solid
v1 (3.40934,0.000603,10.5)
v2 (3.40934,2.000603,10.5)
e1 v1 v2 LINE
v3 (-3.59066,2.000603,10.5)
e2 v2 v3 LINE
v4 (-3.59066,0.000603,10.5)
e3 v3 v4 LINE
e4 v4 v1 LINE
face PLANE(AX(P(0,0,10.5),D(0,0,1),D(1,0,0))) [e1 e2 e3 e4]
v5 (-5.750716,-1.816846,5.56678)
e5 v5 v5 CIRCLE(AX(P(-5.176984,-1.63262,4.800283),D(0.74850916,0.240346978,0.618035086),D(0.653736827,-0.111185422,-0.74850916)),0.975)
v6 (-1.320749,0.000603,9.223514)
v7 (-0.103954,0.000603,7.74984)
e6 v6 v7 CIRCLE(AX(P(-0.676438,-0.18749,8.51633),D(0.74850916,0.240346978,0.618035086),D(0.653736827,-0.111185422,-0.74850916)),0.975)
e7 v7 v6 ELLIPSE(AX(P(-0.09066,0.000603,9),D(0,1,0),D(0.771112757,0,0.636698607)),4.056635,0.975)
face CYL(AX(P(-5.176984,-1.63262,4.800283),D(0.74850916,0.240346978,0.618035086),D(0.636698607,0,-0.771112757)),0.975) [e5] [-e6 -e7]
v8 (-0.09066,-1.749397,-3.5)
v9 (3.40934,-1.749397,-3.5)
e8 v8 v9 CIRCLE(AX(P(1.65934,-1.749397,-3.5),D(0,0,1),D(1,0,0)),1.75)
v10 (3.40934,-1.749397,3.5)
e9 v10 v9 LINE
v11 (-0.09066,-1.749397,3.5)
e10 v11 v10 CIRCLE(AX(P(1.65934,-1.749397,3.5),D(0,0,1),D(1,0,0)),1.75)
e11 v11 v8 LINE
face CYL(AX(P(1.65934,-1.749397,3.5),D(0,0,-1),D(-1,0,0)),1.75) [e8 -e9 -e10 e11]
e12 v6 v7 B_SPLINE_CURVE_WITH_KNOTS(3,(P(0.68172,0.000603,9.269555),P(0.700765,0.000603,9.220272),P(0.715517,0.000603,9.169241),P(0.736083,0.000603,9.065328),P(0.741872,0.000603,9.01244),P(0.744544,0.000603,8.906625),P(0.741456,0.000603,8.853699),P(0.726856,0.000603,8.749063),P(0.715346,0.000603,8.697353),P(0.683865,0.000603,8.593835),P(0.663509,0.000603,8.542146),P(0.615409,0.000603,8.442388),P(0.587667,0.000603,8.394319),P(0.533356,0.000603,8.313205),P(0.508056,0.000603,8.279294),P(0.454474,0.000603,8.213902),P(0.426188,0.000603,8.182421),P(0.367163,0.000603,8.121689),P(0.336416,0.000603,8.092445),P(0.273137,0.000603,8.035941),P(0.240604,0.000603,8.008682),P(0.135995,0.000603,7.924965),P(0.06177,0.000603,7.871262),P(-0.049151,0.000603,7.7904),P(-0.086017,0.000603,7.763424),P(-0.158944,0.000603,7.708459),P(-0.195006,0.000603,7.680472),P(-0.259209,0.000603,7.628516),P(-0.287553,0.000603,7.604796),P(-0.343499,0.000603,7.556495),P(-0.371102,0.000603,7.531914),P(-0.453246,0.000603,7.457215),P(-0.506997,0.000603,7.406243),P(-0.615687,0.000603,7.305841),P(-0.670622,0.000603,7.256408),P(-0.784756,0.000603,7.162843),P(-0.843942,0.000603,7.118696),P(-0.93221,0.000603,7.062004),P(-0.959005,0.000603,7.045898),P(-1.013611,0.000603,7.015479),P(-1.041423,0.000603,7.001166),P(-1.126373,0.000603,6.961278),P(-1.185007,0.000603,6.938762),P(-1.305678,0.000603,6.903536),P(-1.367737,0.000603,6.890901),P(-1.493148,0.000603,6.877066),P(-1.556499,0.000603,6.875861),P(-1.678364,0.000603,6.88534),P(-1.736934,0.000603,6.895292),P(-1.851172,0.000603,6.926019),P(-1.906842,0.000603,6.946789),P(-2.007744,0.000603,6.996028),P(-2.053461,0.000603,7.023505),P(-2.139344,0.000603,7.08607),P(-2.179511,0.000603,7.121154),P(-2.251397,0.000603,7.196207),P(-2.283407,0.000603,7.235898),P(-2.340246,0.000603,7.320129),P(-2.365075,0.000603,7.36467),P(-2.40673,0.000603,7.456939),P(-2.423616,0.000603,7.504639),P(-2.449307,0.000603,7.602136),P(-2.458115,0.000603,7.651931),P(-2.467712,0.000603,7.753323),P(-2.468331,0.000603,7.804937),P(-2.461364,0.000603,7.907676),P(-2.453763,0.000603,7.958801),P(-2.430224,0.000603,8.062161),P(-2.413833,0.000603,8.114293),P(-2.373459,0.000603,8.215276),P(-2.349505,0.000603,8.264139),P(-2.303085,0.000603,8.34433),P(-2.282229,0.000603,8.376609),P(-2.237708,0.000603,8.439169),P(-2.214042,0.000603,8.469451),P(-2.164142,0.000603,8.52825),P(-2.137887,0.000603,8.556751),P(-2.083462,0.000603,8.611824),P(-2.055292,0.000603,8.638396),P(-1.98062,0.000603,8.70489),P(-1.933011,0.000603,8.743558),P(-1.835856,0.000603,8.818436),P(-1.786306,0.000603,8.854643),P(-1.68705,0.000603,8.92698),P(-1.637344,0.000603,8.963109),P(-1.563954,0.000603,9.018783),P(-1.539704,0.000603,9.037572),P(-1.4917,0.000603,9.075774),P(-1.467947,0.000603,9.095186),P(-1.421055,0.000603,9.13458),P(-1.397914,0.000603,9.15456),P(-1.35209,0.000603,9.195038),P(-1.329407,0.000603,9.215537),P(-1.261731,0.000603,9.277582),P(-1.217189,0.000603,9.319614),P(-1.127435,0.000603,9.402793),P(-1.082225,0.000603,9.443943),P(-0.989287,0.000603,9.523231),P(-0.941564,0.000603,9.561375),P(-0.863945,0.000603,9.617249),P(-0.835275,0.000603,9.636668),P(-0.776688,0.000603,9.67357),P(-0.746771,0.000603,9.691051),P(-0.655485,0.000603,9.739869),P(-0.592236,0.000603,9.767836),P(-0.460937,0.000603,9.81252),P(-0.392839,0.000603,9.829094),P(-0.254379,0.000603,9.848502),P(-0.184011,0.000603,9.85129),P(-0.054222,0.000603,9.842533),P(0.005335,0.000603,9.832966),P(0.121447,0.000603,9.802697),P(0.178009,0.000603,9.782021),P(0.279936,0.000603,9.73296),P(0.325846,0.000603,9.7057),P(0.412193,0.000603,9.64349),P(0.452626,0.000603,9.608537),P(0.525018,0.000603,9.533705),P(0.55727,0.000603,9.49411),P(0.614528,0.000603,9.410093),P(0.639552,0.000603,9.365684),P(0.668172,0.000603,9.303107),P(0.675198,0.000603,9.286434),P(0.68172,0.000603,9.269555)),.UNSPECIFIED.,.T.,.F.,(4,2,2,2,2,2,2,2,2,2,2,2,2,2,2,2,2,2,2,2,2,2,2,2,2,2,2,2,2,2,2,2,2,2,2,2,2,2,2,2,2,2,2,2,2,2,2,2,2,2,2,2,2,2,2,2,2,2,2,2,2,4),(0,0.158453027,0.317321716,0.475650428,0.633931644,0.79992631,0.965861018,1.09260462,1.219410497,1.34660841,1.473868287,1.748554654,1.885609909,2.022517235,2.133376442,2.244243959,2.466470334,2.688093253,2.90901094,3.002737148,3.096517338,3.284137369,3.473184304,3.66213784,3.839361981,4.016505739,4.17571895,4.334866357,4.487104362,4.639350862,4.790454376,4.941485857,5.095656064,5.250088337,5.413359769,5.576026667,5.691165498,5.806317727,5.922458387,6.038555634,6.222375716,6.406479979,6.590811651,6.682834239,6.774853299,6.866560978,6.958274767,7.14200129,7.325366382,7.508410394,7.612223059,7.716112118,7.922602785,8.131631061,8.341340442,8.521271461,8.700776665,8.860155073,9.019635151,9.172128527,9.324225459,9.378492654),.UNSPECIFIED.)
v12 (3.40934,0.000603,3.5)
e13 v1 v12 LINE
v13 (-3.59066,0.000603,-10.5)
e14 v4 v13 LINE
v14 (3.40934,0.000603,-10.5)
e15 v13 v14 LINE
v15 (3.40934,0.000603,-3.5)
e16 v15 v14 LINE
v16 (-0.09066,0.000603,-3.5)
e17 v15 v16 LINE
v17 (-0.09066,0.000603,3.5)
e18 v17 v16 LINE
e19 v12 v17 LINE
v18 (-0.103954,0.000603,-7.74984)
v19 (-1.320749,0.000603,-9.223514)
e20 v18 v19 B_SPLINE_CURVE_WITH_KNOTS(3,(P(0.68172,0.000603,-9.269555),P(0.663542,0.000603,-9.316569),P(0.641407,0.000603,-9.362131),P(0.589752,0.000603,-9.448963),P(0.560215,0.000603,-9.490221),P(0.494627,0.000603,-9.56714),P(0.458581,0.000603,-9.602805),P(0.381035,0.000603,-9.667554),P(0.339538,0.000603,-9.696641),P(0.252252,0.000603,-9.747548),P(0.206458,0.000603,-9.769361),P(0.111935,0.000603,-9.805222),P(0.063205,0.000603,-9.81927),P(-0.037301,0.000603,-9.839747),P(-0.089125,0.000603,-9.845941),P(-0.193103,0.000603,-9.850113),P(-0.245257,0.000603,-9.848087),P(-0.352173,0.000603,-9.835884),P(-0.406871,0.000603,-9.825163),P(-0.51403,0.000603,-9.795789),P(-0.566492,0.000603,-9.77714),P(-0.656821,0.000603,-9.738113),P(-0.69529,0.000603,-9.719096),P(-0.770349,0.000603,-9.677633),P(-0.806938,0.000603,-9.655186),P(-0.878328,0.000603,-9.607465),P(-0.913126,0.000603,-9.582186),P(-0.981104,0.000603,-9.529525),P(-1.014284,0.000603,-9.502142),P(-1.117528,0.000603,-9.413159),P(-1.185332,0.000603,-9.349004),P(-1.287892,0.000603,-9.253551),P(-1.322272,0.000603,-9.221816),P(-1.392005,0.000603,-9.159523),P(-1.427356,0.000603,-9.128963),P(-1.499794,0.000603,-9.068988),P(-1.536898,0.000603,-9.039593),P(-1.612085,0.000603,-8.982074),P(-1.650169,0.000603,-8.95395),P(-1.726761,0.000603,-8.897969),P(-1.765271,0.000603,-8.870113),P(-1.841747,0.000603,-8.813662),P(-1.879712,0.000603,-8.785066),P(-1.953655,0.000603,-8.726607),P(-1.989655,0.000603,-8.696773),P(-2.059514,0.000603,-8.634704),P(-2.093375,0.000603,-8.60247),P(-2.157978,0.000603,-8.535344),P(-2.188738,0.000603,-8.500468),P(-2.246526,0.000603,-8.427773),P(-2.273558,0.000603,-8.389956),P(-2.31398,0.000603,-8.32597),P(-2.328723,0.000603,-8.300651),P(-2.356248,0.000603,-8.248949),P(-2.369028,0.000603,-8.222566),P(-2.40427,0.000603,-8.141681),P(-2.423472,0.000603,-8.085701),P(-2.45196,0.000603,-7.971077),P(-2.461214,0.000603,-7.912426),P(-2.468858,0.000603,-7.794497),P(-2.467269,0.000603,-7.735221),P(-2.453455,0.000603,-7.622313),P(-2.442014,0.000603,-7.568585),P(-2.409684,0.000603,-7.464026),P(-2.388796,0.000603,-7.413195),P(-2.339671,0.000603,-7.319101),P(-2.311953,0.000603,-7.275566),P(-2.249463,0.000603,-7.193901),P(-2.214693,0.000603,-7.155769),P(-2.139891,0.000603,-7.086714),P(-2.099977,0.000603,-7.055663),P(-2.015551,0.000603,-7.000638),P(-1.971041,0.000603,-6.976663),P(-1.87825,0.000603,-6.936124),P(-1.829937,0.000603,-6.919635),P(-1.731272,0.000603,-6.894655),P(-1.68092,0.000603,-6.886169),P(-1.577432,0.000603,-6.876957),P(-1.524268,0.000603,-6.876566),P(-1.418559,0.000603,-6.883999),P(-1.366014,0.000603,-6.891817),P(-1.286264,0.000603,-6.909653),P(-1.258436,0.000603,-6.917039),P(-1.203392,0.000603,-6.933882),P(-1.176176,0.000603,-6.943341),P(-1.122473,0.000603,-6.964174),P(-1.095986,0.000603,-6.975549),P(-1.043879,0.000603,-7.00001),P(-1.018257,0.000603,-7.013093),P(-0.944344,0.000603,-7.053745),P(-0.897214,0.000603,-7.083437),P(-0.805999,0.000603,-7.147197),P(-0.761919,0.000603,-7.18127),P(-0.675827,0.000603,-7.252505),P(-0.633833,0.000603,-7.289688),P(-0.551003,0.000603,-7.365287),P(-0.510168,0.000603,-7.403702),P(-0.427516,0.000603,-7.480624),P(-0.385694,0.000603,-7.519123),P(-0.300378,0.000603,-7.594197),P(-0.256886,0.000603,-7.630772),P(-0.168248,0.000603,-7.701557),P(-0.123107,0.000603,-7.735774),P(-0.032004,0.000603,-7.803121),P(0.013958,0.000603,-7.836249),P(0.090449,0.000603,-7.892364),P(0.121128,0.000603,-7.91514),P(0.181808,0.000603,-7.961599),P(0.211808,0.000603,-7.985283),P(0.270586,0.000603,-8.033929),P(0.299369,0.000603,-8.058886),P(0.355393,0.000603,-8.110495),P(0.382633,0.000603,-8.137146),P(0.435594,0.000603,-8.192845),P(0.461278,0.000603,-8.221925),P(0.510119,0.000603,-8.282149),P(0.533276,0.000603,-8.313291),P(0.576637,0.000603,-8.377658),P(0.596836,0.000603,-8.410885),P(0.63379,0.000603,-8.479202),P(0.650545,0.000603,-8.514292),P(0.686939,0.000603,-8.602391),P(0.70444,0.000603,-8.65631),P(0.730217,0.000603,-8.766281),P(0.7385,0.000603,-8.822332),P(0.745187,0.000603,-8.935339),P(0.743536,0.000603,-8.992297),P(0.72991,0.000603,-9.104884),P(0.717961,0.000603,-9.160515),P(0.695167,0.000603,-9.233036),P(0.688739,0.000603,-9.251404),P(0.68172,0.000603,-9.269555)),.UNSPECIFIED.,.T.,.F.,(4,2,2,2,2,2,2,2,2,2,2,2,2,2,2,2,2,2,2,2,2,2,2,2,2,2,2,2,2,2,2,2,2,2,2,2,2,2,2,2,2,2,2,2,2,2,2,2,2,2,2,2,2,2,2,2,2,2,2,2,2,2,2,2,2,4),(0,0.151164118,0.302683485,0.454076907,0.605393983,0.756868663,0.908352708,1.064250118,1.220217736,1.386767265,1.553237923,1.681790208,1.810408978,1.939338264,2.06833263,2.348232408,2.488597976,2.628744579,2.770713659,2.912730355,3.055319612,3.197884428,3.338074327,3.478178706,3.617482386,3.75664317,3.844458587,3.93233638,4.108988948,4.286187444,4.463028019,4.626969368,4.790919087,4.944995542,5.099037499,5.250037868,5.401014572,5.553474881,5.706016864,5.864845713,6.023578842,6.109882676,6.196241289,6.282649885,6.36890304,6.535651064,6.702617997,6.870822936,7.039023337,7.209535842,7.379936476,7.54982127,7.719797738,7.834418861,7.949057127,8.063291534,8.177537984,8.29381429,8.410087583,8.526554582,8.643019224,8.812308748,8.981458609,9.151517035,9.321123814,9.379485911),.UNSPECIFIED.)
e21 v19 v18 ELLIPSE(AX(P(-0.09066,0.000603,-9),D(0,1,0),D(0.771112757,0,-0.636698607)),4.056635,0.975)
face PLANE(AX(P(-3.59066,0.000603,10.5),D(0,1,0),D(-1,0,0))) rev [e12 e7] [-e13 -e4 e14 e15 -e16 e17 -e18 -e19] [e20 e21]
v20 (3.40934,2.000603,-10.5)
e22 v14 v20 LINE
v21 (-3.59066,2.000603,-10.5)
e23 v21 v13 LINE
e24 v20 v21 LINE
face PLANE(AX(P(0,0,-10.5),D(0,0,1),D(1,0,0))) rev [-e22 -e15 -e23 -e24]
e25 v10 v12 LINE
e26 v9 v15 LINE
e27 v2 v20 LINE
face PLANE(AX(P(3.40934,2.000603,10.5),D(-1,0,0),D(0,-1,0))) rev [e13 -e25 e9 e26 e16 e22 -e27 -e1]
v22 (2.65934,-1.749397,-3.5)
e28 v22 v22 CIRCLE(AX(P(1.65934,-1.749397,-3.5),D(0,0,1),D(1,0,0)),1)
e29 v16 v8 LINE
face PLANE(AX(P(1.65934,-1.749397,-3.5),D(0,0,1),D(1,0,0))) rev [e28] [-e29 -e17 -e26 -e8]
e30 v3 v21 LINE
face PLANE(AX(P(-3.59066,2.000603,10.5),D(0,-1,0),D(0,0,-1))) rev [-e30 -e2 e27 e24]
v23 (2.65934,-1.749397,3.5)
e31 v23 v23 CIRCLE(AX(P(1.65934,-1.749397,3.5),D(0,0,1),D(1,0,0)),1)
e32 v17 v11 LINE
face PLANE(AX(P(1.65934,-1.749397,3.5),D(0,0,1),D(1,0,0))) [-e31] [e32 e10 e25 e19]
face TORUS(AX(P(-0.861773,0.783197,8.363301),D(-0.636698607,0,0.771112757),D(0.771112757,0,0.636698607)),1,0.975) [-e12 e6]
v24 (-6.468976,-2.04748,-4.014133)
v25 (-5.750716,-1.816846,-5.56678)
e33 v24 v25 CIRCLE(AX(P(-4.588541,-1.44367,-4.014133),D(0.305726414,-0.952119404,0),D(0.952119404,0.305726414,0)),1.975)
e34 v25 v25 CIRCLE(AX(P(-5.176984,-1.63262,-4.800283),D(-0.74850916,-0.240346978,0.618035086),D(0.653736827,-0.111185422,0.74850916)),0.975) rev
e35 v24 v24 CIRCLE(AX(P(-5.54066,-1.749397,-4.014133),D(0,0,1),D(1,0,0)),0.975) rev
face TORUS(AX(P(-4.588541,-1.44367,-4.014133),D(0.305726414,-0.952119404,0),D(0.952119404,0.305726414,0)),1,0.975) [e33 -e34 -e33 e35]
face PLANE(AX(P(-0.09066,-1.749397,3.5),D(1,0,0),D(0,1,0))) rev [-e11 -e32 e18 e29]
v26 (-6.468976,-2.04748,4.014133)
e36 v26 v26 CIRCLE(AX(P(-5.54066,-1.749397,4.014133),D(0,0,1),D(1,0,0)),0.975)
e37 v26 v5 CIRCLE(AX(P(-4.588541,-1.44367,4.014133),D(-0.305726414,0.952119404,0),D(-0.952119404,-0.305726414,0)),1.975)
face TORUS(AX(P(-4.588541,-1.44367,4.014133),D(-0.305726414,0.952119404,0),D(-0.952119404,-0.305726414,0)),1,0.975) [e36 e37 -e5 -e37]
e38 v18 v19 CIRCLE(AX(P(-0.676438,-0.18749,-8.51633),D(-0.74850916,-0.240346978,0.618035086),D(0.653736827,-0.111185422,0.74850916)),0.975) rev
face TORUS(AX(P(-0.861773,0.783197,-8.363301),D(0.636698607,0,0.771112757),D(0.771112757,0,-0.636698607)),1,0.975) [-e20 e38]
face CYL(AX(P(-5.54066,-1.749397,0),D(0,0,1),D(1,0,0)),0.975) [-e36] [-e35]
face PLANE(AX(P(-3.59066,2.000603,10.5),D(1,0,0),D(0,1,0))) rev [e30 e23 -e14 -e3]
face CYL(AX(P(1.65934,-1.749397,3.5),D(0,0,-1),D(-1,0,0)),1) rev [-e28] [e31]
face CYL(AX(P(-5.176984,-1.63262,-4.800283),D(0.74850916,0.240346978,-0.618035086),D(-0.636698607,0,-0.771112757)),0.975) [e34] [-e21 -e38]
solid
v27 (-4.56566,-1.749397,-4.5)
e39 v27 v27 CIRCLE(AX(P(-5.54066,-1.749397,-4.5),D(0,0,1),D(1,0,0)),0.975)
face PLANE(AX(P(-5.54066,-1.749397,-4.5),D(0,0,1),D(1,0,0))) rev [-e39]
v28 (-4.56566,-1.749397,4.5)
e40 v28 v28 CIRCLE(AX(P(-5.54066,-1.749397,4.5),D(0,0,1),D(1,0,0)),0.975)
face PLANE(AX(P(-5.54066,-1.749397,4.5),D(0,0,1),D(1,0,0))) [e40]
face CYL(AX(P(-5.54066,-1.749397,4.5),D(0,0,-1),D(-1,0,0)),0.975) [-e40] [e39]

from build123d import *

# Parameters (mm, degrees)
SKETCH1_W           = 7
SKETCH1_H           = 2
BOSS_EXTRUDE1_DEPTH = 10.5
SKETCH2_R           = 1
BOSS_EXTRUDE2_DEPTH = 3.5
SKETCH3_R           = 0.975
BOSS_EXTRUDE3_DEPTH = 4.5
SWEEP1_ANGLE        = 52.758136
SWEEP1_2_OUTLINE_R  = 0.975
SWEEP1_2_ANGLE      = 51.827212
SWEEP1_START        = -1.300671735
SWEEP1_3_OUTLINE_R  = 0.975
SWEEP1_3_DEPTH      = 6.012679668
SWEEP1_4_OUTLINE_R  = 0.975
SWEEP1_4_DEPTH      = 4.014132691


with BuildPart() as part:
    # Sketch1 → Boss-Extrude1 (new, symmetric)
    with BuildSketch(Plane.XY):
        with Locations((-0.090659996, 1.000603453)):
            Rectangle(SKETCH1_W, SKETCH1_H)
    extrude(amount=BOSS_EXTRUDE1_DEPTH, both=True)

    # Sketch2 → Boss-Extrude2 (add, symmetric)
    with BuildSketch(Plane.XY):
        with BuildLine():
            Line((3.409340004, 0.000603453), (3.409340004, -1.749396547))
            ThreePointArc((3.409340004, -1.749396547), (1.659340004, -3.499396547), (-0.090659996, -1.749396547))
            Line((-0.090659996, -1.749396547), (-0.090659996, 0.000603453))
            Line((-0.090659996, 0.000603453), (3.409340004, 0.000603453))
        make_face()
        with Locations((1.659340004, -1.749396547)):
            Circle(SKETCH2_R, mode=Mode.SUBTRACT)
    extrude(amount=BOSS_EXTRUDE2_DEPTH, both=True)

    # Sweep1: read off the stored shape, not the designer's step
    # Sweep1 outline → Sweep1 (revolve)
    with BuildSketch(Plane(origin=(3.593677223, 0.783196597, 2.967256422), x_dir=(0.7080400901637386, -0.39610400747133684, 0.5846202579333633), z_dir=(0.3054408532938203, 0.9182056497676037, 0.2521988696921456))):
        with BuildLine():
            Line((0.806226014, -6.042187467), (0.806225946, -7.953288333))
            ThreePointArc((0.806225946, -7.953288333), (1.975, -6.997737942), (0.806226014, -6.042187467))
        make_face()
    sweep1 = revolve(axis=Axis((3.593677223, 0.783196597, 2.967256422), (0.6366986067678082, 0, -0.7711127570854551)), revolution_arc=SWEEP1_ANGLE)

    # Sweep1 2 outline → Sweep1 2 (revolve)
    with BuildSketch(Plane(origin=(-4.579891067, -1.470607223, 4.014132591), x_dir=(-0.5884431979545631, -0.18894965071935535, 0.7861505150249796), z_dir=(0.7485091599062733, 0.24034697795155588, 0.6180350861609393))):
        with Locations((1, -0.028291715)):
            Circle(SWEEP1_2_OUTLINE_R)
    sweep1_2 = revolve(axis=Axis((-4.579891067, -1.470607223, 4.014132591), (0.3057264141637292, -0.9521194041098986, 0)), revolution_arc=SWEEP1_2_ANGLE)

    # Sweep1 3 outline → Sweep1 3 (add)
    with BuildSketch(Plane(origin=(0, 0, 0), x_dir=(0.6631244510169609, -0.2712943464482258, -0.69761403372401), z_dir=(0.7485091599061792, 0.24034697795152507, 0.6180350861610652)).offset(SWEEP1_START)):
        with Locations((-6.338808877, -3.261453929)):
            Circle(SWEEP1_3_OUTLINE_R)
    sweep1_3 = extrude(amount=SWEEP1_3_DEPTH)

    # Sweep1 4 outline → Sweep1 4 (add)
    with BuildSketch(Plane.XY):
        with Locations((-5.540659996, -1.749396547)):
            Circle(SWEEP1_4_OUTLINE_R)
    sweep1_4 = extrude(amount=SWEEP1_4_DEPTH)

    # Mirror1: Sweep1, Sweep1 2, Sweep1 3, Sweep1 4 across plane
    add(sweep1.mirror(Plane.XY))
    add(sweep1_2.mirror(Plane.XY))
    add(sweep1_3.mirror(Plane.XY))
    add(sweep1_4.mirror(Plane.XY))


with BuildPart() as body_2:
    # Sketch3 → Boss-Extrude3 (new, symmetric)
    with BuildSketch(Plane.XY):
        with Locations((-5.540659996, -1.749396547)):
            Circle(SKETCH3_R)
    extrude(amount=BOSS_EXTRUDE3_DEPTH, both=True)


solid = Compound([part.part, body_2.part])
